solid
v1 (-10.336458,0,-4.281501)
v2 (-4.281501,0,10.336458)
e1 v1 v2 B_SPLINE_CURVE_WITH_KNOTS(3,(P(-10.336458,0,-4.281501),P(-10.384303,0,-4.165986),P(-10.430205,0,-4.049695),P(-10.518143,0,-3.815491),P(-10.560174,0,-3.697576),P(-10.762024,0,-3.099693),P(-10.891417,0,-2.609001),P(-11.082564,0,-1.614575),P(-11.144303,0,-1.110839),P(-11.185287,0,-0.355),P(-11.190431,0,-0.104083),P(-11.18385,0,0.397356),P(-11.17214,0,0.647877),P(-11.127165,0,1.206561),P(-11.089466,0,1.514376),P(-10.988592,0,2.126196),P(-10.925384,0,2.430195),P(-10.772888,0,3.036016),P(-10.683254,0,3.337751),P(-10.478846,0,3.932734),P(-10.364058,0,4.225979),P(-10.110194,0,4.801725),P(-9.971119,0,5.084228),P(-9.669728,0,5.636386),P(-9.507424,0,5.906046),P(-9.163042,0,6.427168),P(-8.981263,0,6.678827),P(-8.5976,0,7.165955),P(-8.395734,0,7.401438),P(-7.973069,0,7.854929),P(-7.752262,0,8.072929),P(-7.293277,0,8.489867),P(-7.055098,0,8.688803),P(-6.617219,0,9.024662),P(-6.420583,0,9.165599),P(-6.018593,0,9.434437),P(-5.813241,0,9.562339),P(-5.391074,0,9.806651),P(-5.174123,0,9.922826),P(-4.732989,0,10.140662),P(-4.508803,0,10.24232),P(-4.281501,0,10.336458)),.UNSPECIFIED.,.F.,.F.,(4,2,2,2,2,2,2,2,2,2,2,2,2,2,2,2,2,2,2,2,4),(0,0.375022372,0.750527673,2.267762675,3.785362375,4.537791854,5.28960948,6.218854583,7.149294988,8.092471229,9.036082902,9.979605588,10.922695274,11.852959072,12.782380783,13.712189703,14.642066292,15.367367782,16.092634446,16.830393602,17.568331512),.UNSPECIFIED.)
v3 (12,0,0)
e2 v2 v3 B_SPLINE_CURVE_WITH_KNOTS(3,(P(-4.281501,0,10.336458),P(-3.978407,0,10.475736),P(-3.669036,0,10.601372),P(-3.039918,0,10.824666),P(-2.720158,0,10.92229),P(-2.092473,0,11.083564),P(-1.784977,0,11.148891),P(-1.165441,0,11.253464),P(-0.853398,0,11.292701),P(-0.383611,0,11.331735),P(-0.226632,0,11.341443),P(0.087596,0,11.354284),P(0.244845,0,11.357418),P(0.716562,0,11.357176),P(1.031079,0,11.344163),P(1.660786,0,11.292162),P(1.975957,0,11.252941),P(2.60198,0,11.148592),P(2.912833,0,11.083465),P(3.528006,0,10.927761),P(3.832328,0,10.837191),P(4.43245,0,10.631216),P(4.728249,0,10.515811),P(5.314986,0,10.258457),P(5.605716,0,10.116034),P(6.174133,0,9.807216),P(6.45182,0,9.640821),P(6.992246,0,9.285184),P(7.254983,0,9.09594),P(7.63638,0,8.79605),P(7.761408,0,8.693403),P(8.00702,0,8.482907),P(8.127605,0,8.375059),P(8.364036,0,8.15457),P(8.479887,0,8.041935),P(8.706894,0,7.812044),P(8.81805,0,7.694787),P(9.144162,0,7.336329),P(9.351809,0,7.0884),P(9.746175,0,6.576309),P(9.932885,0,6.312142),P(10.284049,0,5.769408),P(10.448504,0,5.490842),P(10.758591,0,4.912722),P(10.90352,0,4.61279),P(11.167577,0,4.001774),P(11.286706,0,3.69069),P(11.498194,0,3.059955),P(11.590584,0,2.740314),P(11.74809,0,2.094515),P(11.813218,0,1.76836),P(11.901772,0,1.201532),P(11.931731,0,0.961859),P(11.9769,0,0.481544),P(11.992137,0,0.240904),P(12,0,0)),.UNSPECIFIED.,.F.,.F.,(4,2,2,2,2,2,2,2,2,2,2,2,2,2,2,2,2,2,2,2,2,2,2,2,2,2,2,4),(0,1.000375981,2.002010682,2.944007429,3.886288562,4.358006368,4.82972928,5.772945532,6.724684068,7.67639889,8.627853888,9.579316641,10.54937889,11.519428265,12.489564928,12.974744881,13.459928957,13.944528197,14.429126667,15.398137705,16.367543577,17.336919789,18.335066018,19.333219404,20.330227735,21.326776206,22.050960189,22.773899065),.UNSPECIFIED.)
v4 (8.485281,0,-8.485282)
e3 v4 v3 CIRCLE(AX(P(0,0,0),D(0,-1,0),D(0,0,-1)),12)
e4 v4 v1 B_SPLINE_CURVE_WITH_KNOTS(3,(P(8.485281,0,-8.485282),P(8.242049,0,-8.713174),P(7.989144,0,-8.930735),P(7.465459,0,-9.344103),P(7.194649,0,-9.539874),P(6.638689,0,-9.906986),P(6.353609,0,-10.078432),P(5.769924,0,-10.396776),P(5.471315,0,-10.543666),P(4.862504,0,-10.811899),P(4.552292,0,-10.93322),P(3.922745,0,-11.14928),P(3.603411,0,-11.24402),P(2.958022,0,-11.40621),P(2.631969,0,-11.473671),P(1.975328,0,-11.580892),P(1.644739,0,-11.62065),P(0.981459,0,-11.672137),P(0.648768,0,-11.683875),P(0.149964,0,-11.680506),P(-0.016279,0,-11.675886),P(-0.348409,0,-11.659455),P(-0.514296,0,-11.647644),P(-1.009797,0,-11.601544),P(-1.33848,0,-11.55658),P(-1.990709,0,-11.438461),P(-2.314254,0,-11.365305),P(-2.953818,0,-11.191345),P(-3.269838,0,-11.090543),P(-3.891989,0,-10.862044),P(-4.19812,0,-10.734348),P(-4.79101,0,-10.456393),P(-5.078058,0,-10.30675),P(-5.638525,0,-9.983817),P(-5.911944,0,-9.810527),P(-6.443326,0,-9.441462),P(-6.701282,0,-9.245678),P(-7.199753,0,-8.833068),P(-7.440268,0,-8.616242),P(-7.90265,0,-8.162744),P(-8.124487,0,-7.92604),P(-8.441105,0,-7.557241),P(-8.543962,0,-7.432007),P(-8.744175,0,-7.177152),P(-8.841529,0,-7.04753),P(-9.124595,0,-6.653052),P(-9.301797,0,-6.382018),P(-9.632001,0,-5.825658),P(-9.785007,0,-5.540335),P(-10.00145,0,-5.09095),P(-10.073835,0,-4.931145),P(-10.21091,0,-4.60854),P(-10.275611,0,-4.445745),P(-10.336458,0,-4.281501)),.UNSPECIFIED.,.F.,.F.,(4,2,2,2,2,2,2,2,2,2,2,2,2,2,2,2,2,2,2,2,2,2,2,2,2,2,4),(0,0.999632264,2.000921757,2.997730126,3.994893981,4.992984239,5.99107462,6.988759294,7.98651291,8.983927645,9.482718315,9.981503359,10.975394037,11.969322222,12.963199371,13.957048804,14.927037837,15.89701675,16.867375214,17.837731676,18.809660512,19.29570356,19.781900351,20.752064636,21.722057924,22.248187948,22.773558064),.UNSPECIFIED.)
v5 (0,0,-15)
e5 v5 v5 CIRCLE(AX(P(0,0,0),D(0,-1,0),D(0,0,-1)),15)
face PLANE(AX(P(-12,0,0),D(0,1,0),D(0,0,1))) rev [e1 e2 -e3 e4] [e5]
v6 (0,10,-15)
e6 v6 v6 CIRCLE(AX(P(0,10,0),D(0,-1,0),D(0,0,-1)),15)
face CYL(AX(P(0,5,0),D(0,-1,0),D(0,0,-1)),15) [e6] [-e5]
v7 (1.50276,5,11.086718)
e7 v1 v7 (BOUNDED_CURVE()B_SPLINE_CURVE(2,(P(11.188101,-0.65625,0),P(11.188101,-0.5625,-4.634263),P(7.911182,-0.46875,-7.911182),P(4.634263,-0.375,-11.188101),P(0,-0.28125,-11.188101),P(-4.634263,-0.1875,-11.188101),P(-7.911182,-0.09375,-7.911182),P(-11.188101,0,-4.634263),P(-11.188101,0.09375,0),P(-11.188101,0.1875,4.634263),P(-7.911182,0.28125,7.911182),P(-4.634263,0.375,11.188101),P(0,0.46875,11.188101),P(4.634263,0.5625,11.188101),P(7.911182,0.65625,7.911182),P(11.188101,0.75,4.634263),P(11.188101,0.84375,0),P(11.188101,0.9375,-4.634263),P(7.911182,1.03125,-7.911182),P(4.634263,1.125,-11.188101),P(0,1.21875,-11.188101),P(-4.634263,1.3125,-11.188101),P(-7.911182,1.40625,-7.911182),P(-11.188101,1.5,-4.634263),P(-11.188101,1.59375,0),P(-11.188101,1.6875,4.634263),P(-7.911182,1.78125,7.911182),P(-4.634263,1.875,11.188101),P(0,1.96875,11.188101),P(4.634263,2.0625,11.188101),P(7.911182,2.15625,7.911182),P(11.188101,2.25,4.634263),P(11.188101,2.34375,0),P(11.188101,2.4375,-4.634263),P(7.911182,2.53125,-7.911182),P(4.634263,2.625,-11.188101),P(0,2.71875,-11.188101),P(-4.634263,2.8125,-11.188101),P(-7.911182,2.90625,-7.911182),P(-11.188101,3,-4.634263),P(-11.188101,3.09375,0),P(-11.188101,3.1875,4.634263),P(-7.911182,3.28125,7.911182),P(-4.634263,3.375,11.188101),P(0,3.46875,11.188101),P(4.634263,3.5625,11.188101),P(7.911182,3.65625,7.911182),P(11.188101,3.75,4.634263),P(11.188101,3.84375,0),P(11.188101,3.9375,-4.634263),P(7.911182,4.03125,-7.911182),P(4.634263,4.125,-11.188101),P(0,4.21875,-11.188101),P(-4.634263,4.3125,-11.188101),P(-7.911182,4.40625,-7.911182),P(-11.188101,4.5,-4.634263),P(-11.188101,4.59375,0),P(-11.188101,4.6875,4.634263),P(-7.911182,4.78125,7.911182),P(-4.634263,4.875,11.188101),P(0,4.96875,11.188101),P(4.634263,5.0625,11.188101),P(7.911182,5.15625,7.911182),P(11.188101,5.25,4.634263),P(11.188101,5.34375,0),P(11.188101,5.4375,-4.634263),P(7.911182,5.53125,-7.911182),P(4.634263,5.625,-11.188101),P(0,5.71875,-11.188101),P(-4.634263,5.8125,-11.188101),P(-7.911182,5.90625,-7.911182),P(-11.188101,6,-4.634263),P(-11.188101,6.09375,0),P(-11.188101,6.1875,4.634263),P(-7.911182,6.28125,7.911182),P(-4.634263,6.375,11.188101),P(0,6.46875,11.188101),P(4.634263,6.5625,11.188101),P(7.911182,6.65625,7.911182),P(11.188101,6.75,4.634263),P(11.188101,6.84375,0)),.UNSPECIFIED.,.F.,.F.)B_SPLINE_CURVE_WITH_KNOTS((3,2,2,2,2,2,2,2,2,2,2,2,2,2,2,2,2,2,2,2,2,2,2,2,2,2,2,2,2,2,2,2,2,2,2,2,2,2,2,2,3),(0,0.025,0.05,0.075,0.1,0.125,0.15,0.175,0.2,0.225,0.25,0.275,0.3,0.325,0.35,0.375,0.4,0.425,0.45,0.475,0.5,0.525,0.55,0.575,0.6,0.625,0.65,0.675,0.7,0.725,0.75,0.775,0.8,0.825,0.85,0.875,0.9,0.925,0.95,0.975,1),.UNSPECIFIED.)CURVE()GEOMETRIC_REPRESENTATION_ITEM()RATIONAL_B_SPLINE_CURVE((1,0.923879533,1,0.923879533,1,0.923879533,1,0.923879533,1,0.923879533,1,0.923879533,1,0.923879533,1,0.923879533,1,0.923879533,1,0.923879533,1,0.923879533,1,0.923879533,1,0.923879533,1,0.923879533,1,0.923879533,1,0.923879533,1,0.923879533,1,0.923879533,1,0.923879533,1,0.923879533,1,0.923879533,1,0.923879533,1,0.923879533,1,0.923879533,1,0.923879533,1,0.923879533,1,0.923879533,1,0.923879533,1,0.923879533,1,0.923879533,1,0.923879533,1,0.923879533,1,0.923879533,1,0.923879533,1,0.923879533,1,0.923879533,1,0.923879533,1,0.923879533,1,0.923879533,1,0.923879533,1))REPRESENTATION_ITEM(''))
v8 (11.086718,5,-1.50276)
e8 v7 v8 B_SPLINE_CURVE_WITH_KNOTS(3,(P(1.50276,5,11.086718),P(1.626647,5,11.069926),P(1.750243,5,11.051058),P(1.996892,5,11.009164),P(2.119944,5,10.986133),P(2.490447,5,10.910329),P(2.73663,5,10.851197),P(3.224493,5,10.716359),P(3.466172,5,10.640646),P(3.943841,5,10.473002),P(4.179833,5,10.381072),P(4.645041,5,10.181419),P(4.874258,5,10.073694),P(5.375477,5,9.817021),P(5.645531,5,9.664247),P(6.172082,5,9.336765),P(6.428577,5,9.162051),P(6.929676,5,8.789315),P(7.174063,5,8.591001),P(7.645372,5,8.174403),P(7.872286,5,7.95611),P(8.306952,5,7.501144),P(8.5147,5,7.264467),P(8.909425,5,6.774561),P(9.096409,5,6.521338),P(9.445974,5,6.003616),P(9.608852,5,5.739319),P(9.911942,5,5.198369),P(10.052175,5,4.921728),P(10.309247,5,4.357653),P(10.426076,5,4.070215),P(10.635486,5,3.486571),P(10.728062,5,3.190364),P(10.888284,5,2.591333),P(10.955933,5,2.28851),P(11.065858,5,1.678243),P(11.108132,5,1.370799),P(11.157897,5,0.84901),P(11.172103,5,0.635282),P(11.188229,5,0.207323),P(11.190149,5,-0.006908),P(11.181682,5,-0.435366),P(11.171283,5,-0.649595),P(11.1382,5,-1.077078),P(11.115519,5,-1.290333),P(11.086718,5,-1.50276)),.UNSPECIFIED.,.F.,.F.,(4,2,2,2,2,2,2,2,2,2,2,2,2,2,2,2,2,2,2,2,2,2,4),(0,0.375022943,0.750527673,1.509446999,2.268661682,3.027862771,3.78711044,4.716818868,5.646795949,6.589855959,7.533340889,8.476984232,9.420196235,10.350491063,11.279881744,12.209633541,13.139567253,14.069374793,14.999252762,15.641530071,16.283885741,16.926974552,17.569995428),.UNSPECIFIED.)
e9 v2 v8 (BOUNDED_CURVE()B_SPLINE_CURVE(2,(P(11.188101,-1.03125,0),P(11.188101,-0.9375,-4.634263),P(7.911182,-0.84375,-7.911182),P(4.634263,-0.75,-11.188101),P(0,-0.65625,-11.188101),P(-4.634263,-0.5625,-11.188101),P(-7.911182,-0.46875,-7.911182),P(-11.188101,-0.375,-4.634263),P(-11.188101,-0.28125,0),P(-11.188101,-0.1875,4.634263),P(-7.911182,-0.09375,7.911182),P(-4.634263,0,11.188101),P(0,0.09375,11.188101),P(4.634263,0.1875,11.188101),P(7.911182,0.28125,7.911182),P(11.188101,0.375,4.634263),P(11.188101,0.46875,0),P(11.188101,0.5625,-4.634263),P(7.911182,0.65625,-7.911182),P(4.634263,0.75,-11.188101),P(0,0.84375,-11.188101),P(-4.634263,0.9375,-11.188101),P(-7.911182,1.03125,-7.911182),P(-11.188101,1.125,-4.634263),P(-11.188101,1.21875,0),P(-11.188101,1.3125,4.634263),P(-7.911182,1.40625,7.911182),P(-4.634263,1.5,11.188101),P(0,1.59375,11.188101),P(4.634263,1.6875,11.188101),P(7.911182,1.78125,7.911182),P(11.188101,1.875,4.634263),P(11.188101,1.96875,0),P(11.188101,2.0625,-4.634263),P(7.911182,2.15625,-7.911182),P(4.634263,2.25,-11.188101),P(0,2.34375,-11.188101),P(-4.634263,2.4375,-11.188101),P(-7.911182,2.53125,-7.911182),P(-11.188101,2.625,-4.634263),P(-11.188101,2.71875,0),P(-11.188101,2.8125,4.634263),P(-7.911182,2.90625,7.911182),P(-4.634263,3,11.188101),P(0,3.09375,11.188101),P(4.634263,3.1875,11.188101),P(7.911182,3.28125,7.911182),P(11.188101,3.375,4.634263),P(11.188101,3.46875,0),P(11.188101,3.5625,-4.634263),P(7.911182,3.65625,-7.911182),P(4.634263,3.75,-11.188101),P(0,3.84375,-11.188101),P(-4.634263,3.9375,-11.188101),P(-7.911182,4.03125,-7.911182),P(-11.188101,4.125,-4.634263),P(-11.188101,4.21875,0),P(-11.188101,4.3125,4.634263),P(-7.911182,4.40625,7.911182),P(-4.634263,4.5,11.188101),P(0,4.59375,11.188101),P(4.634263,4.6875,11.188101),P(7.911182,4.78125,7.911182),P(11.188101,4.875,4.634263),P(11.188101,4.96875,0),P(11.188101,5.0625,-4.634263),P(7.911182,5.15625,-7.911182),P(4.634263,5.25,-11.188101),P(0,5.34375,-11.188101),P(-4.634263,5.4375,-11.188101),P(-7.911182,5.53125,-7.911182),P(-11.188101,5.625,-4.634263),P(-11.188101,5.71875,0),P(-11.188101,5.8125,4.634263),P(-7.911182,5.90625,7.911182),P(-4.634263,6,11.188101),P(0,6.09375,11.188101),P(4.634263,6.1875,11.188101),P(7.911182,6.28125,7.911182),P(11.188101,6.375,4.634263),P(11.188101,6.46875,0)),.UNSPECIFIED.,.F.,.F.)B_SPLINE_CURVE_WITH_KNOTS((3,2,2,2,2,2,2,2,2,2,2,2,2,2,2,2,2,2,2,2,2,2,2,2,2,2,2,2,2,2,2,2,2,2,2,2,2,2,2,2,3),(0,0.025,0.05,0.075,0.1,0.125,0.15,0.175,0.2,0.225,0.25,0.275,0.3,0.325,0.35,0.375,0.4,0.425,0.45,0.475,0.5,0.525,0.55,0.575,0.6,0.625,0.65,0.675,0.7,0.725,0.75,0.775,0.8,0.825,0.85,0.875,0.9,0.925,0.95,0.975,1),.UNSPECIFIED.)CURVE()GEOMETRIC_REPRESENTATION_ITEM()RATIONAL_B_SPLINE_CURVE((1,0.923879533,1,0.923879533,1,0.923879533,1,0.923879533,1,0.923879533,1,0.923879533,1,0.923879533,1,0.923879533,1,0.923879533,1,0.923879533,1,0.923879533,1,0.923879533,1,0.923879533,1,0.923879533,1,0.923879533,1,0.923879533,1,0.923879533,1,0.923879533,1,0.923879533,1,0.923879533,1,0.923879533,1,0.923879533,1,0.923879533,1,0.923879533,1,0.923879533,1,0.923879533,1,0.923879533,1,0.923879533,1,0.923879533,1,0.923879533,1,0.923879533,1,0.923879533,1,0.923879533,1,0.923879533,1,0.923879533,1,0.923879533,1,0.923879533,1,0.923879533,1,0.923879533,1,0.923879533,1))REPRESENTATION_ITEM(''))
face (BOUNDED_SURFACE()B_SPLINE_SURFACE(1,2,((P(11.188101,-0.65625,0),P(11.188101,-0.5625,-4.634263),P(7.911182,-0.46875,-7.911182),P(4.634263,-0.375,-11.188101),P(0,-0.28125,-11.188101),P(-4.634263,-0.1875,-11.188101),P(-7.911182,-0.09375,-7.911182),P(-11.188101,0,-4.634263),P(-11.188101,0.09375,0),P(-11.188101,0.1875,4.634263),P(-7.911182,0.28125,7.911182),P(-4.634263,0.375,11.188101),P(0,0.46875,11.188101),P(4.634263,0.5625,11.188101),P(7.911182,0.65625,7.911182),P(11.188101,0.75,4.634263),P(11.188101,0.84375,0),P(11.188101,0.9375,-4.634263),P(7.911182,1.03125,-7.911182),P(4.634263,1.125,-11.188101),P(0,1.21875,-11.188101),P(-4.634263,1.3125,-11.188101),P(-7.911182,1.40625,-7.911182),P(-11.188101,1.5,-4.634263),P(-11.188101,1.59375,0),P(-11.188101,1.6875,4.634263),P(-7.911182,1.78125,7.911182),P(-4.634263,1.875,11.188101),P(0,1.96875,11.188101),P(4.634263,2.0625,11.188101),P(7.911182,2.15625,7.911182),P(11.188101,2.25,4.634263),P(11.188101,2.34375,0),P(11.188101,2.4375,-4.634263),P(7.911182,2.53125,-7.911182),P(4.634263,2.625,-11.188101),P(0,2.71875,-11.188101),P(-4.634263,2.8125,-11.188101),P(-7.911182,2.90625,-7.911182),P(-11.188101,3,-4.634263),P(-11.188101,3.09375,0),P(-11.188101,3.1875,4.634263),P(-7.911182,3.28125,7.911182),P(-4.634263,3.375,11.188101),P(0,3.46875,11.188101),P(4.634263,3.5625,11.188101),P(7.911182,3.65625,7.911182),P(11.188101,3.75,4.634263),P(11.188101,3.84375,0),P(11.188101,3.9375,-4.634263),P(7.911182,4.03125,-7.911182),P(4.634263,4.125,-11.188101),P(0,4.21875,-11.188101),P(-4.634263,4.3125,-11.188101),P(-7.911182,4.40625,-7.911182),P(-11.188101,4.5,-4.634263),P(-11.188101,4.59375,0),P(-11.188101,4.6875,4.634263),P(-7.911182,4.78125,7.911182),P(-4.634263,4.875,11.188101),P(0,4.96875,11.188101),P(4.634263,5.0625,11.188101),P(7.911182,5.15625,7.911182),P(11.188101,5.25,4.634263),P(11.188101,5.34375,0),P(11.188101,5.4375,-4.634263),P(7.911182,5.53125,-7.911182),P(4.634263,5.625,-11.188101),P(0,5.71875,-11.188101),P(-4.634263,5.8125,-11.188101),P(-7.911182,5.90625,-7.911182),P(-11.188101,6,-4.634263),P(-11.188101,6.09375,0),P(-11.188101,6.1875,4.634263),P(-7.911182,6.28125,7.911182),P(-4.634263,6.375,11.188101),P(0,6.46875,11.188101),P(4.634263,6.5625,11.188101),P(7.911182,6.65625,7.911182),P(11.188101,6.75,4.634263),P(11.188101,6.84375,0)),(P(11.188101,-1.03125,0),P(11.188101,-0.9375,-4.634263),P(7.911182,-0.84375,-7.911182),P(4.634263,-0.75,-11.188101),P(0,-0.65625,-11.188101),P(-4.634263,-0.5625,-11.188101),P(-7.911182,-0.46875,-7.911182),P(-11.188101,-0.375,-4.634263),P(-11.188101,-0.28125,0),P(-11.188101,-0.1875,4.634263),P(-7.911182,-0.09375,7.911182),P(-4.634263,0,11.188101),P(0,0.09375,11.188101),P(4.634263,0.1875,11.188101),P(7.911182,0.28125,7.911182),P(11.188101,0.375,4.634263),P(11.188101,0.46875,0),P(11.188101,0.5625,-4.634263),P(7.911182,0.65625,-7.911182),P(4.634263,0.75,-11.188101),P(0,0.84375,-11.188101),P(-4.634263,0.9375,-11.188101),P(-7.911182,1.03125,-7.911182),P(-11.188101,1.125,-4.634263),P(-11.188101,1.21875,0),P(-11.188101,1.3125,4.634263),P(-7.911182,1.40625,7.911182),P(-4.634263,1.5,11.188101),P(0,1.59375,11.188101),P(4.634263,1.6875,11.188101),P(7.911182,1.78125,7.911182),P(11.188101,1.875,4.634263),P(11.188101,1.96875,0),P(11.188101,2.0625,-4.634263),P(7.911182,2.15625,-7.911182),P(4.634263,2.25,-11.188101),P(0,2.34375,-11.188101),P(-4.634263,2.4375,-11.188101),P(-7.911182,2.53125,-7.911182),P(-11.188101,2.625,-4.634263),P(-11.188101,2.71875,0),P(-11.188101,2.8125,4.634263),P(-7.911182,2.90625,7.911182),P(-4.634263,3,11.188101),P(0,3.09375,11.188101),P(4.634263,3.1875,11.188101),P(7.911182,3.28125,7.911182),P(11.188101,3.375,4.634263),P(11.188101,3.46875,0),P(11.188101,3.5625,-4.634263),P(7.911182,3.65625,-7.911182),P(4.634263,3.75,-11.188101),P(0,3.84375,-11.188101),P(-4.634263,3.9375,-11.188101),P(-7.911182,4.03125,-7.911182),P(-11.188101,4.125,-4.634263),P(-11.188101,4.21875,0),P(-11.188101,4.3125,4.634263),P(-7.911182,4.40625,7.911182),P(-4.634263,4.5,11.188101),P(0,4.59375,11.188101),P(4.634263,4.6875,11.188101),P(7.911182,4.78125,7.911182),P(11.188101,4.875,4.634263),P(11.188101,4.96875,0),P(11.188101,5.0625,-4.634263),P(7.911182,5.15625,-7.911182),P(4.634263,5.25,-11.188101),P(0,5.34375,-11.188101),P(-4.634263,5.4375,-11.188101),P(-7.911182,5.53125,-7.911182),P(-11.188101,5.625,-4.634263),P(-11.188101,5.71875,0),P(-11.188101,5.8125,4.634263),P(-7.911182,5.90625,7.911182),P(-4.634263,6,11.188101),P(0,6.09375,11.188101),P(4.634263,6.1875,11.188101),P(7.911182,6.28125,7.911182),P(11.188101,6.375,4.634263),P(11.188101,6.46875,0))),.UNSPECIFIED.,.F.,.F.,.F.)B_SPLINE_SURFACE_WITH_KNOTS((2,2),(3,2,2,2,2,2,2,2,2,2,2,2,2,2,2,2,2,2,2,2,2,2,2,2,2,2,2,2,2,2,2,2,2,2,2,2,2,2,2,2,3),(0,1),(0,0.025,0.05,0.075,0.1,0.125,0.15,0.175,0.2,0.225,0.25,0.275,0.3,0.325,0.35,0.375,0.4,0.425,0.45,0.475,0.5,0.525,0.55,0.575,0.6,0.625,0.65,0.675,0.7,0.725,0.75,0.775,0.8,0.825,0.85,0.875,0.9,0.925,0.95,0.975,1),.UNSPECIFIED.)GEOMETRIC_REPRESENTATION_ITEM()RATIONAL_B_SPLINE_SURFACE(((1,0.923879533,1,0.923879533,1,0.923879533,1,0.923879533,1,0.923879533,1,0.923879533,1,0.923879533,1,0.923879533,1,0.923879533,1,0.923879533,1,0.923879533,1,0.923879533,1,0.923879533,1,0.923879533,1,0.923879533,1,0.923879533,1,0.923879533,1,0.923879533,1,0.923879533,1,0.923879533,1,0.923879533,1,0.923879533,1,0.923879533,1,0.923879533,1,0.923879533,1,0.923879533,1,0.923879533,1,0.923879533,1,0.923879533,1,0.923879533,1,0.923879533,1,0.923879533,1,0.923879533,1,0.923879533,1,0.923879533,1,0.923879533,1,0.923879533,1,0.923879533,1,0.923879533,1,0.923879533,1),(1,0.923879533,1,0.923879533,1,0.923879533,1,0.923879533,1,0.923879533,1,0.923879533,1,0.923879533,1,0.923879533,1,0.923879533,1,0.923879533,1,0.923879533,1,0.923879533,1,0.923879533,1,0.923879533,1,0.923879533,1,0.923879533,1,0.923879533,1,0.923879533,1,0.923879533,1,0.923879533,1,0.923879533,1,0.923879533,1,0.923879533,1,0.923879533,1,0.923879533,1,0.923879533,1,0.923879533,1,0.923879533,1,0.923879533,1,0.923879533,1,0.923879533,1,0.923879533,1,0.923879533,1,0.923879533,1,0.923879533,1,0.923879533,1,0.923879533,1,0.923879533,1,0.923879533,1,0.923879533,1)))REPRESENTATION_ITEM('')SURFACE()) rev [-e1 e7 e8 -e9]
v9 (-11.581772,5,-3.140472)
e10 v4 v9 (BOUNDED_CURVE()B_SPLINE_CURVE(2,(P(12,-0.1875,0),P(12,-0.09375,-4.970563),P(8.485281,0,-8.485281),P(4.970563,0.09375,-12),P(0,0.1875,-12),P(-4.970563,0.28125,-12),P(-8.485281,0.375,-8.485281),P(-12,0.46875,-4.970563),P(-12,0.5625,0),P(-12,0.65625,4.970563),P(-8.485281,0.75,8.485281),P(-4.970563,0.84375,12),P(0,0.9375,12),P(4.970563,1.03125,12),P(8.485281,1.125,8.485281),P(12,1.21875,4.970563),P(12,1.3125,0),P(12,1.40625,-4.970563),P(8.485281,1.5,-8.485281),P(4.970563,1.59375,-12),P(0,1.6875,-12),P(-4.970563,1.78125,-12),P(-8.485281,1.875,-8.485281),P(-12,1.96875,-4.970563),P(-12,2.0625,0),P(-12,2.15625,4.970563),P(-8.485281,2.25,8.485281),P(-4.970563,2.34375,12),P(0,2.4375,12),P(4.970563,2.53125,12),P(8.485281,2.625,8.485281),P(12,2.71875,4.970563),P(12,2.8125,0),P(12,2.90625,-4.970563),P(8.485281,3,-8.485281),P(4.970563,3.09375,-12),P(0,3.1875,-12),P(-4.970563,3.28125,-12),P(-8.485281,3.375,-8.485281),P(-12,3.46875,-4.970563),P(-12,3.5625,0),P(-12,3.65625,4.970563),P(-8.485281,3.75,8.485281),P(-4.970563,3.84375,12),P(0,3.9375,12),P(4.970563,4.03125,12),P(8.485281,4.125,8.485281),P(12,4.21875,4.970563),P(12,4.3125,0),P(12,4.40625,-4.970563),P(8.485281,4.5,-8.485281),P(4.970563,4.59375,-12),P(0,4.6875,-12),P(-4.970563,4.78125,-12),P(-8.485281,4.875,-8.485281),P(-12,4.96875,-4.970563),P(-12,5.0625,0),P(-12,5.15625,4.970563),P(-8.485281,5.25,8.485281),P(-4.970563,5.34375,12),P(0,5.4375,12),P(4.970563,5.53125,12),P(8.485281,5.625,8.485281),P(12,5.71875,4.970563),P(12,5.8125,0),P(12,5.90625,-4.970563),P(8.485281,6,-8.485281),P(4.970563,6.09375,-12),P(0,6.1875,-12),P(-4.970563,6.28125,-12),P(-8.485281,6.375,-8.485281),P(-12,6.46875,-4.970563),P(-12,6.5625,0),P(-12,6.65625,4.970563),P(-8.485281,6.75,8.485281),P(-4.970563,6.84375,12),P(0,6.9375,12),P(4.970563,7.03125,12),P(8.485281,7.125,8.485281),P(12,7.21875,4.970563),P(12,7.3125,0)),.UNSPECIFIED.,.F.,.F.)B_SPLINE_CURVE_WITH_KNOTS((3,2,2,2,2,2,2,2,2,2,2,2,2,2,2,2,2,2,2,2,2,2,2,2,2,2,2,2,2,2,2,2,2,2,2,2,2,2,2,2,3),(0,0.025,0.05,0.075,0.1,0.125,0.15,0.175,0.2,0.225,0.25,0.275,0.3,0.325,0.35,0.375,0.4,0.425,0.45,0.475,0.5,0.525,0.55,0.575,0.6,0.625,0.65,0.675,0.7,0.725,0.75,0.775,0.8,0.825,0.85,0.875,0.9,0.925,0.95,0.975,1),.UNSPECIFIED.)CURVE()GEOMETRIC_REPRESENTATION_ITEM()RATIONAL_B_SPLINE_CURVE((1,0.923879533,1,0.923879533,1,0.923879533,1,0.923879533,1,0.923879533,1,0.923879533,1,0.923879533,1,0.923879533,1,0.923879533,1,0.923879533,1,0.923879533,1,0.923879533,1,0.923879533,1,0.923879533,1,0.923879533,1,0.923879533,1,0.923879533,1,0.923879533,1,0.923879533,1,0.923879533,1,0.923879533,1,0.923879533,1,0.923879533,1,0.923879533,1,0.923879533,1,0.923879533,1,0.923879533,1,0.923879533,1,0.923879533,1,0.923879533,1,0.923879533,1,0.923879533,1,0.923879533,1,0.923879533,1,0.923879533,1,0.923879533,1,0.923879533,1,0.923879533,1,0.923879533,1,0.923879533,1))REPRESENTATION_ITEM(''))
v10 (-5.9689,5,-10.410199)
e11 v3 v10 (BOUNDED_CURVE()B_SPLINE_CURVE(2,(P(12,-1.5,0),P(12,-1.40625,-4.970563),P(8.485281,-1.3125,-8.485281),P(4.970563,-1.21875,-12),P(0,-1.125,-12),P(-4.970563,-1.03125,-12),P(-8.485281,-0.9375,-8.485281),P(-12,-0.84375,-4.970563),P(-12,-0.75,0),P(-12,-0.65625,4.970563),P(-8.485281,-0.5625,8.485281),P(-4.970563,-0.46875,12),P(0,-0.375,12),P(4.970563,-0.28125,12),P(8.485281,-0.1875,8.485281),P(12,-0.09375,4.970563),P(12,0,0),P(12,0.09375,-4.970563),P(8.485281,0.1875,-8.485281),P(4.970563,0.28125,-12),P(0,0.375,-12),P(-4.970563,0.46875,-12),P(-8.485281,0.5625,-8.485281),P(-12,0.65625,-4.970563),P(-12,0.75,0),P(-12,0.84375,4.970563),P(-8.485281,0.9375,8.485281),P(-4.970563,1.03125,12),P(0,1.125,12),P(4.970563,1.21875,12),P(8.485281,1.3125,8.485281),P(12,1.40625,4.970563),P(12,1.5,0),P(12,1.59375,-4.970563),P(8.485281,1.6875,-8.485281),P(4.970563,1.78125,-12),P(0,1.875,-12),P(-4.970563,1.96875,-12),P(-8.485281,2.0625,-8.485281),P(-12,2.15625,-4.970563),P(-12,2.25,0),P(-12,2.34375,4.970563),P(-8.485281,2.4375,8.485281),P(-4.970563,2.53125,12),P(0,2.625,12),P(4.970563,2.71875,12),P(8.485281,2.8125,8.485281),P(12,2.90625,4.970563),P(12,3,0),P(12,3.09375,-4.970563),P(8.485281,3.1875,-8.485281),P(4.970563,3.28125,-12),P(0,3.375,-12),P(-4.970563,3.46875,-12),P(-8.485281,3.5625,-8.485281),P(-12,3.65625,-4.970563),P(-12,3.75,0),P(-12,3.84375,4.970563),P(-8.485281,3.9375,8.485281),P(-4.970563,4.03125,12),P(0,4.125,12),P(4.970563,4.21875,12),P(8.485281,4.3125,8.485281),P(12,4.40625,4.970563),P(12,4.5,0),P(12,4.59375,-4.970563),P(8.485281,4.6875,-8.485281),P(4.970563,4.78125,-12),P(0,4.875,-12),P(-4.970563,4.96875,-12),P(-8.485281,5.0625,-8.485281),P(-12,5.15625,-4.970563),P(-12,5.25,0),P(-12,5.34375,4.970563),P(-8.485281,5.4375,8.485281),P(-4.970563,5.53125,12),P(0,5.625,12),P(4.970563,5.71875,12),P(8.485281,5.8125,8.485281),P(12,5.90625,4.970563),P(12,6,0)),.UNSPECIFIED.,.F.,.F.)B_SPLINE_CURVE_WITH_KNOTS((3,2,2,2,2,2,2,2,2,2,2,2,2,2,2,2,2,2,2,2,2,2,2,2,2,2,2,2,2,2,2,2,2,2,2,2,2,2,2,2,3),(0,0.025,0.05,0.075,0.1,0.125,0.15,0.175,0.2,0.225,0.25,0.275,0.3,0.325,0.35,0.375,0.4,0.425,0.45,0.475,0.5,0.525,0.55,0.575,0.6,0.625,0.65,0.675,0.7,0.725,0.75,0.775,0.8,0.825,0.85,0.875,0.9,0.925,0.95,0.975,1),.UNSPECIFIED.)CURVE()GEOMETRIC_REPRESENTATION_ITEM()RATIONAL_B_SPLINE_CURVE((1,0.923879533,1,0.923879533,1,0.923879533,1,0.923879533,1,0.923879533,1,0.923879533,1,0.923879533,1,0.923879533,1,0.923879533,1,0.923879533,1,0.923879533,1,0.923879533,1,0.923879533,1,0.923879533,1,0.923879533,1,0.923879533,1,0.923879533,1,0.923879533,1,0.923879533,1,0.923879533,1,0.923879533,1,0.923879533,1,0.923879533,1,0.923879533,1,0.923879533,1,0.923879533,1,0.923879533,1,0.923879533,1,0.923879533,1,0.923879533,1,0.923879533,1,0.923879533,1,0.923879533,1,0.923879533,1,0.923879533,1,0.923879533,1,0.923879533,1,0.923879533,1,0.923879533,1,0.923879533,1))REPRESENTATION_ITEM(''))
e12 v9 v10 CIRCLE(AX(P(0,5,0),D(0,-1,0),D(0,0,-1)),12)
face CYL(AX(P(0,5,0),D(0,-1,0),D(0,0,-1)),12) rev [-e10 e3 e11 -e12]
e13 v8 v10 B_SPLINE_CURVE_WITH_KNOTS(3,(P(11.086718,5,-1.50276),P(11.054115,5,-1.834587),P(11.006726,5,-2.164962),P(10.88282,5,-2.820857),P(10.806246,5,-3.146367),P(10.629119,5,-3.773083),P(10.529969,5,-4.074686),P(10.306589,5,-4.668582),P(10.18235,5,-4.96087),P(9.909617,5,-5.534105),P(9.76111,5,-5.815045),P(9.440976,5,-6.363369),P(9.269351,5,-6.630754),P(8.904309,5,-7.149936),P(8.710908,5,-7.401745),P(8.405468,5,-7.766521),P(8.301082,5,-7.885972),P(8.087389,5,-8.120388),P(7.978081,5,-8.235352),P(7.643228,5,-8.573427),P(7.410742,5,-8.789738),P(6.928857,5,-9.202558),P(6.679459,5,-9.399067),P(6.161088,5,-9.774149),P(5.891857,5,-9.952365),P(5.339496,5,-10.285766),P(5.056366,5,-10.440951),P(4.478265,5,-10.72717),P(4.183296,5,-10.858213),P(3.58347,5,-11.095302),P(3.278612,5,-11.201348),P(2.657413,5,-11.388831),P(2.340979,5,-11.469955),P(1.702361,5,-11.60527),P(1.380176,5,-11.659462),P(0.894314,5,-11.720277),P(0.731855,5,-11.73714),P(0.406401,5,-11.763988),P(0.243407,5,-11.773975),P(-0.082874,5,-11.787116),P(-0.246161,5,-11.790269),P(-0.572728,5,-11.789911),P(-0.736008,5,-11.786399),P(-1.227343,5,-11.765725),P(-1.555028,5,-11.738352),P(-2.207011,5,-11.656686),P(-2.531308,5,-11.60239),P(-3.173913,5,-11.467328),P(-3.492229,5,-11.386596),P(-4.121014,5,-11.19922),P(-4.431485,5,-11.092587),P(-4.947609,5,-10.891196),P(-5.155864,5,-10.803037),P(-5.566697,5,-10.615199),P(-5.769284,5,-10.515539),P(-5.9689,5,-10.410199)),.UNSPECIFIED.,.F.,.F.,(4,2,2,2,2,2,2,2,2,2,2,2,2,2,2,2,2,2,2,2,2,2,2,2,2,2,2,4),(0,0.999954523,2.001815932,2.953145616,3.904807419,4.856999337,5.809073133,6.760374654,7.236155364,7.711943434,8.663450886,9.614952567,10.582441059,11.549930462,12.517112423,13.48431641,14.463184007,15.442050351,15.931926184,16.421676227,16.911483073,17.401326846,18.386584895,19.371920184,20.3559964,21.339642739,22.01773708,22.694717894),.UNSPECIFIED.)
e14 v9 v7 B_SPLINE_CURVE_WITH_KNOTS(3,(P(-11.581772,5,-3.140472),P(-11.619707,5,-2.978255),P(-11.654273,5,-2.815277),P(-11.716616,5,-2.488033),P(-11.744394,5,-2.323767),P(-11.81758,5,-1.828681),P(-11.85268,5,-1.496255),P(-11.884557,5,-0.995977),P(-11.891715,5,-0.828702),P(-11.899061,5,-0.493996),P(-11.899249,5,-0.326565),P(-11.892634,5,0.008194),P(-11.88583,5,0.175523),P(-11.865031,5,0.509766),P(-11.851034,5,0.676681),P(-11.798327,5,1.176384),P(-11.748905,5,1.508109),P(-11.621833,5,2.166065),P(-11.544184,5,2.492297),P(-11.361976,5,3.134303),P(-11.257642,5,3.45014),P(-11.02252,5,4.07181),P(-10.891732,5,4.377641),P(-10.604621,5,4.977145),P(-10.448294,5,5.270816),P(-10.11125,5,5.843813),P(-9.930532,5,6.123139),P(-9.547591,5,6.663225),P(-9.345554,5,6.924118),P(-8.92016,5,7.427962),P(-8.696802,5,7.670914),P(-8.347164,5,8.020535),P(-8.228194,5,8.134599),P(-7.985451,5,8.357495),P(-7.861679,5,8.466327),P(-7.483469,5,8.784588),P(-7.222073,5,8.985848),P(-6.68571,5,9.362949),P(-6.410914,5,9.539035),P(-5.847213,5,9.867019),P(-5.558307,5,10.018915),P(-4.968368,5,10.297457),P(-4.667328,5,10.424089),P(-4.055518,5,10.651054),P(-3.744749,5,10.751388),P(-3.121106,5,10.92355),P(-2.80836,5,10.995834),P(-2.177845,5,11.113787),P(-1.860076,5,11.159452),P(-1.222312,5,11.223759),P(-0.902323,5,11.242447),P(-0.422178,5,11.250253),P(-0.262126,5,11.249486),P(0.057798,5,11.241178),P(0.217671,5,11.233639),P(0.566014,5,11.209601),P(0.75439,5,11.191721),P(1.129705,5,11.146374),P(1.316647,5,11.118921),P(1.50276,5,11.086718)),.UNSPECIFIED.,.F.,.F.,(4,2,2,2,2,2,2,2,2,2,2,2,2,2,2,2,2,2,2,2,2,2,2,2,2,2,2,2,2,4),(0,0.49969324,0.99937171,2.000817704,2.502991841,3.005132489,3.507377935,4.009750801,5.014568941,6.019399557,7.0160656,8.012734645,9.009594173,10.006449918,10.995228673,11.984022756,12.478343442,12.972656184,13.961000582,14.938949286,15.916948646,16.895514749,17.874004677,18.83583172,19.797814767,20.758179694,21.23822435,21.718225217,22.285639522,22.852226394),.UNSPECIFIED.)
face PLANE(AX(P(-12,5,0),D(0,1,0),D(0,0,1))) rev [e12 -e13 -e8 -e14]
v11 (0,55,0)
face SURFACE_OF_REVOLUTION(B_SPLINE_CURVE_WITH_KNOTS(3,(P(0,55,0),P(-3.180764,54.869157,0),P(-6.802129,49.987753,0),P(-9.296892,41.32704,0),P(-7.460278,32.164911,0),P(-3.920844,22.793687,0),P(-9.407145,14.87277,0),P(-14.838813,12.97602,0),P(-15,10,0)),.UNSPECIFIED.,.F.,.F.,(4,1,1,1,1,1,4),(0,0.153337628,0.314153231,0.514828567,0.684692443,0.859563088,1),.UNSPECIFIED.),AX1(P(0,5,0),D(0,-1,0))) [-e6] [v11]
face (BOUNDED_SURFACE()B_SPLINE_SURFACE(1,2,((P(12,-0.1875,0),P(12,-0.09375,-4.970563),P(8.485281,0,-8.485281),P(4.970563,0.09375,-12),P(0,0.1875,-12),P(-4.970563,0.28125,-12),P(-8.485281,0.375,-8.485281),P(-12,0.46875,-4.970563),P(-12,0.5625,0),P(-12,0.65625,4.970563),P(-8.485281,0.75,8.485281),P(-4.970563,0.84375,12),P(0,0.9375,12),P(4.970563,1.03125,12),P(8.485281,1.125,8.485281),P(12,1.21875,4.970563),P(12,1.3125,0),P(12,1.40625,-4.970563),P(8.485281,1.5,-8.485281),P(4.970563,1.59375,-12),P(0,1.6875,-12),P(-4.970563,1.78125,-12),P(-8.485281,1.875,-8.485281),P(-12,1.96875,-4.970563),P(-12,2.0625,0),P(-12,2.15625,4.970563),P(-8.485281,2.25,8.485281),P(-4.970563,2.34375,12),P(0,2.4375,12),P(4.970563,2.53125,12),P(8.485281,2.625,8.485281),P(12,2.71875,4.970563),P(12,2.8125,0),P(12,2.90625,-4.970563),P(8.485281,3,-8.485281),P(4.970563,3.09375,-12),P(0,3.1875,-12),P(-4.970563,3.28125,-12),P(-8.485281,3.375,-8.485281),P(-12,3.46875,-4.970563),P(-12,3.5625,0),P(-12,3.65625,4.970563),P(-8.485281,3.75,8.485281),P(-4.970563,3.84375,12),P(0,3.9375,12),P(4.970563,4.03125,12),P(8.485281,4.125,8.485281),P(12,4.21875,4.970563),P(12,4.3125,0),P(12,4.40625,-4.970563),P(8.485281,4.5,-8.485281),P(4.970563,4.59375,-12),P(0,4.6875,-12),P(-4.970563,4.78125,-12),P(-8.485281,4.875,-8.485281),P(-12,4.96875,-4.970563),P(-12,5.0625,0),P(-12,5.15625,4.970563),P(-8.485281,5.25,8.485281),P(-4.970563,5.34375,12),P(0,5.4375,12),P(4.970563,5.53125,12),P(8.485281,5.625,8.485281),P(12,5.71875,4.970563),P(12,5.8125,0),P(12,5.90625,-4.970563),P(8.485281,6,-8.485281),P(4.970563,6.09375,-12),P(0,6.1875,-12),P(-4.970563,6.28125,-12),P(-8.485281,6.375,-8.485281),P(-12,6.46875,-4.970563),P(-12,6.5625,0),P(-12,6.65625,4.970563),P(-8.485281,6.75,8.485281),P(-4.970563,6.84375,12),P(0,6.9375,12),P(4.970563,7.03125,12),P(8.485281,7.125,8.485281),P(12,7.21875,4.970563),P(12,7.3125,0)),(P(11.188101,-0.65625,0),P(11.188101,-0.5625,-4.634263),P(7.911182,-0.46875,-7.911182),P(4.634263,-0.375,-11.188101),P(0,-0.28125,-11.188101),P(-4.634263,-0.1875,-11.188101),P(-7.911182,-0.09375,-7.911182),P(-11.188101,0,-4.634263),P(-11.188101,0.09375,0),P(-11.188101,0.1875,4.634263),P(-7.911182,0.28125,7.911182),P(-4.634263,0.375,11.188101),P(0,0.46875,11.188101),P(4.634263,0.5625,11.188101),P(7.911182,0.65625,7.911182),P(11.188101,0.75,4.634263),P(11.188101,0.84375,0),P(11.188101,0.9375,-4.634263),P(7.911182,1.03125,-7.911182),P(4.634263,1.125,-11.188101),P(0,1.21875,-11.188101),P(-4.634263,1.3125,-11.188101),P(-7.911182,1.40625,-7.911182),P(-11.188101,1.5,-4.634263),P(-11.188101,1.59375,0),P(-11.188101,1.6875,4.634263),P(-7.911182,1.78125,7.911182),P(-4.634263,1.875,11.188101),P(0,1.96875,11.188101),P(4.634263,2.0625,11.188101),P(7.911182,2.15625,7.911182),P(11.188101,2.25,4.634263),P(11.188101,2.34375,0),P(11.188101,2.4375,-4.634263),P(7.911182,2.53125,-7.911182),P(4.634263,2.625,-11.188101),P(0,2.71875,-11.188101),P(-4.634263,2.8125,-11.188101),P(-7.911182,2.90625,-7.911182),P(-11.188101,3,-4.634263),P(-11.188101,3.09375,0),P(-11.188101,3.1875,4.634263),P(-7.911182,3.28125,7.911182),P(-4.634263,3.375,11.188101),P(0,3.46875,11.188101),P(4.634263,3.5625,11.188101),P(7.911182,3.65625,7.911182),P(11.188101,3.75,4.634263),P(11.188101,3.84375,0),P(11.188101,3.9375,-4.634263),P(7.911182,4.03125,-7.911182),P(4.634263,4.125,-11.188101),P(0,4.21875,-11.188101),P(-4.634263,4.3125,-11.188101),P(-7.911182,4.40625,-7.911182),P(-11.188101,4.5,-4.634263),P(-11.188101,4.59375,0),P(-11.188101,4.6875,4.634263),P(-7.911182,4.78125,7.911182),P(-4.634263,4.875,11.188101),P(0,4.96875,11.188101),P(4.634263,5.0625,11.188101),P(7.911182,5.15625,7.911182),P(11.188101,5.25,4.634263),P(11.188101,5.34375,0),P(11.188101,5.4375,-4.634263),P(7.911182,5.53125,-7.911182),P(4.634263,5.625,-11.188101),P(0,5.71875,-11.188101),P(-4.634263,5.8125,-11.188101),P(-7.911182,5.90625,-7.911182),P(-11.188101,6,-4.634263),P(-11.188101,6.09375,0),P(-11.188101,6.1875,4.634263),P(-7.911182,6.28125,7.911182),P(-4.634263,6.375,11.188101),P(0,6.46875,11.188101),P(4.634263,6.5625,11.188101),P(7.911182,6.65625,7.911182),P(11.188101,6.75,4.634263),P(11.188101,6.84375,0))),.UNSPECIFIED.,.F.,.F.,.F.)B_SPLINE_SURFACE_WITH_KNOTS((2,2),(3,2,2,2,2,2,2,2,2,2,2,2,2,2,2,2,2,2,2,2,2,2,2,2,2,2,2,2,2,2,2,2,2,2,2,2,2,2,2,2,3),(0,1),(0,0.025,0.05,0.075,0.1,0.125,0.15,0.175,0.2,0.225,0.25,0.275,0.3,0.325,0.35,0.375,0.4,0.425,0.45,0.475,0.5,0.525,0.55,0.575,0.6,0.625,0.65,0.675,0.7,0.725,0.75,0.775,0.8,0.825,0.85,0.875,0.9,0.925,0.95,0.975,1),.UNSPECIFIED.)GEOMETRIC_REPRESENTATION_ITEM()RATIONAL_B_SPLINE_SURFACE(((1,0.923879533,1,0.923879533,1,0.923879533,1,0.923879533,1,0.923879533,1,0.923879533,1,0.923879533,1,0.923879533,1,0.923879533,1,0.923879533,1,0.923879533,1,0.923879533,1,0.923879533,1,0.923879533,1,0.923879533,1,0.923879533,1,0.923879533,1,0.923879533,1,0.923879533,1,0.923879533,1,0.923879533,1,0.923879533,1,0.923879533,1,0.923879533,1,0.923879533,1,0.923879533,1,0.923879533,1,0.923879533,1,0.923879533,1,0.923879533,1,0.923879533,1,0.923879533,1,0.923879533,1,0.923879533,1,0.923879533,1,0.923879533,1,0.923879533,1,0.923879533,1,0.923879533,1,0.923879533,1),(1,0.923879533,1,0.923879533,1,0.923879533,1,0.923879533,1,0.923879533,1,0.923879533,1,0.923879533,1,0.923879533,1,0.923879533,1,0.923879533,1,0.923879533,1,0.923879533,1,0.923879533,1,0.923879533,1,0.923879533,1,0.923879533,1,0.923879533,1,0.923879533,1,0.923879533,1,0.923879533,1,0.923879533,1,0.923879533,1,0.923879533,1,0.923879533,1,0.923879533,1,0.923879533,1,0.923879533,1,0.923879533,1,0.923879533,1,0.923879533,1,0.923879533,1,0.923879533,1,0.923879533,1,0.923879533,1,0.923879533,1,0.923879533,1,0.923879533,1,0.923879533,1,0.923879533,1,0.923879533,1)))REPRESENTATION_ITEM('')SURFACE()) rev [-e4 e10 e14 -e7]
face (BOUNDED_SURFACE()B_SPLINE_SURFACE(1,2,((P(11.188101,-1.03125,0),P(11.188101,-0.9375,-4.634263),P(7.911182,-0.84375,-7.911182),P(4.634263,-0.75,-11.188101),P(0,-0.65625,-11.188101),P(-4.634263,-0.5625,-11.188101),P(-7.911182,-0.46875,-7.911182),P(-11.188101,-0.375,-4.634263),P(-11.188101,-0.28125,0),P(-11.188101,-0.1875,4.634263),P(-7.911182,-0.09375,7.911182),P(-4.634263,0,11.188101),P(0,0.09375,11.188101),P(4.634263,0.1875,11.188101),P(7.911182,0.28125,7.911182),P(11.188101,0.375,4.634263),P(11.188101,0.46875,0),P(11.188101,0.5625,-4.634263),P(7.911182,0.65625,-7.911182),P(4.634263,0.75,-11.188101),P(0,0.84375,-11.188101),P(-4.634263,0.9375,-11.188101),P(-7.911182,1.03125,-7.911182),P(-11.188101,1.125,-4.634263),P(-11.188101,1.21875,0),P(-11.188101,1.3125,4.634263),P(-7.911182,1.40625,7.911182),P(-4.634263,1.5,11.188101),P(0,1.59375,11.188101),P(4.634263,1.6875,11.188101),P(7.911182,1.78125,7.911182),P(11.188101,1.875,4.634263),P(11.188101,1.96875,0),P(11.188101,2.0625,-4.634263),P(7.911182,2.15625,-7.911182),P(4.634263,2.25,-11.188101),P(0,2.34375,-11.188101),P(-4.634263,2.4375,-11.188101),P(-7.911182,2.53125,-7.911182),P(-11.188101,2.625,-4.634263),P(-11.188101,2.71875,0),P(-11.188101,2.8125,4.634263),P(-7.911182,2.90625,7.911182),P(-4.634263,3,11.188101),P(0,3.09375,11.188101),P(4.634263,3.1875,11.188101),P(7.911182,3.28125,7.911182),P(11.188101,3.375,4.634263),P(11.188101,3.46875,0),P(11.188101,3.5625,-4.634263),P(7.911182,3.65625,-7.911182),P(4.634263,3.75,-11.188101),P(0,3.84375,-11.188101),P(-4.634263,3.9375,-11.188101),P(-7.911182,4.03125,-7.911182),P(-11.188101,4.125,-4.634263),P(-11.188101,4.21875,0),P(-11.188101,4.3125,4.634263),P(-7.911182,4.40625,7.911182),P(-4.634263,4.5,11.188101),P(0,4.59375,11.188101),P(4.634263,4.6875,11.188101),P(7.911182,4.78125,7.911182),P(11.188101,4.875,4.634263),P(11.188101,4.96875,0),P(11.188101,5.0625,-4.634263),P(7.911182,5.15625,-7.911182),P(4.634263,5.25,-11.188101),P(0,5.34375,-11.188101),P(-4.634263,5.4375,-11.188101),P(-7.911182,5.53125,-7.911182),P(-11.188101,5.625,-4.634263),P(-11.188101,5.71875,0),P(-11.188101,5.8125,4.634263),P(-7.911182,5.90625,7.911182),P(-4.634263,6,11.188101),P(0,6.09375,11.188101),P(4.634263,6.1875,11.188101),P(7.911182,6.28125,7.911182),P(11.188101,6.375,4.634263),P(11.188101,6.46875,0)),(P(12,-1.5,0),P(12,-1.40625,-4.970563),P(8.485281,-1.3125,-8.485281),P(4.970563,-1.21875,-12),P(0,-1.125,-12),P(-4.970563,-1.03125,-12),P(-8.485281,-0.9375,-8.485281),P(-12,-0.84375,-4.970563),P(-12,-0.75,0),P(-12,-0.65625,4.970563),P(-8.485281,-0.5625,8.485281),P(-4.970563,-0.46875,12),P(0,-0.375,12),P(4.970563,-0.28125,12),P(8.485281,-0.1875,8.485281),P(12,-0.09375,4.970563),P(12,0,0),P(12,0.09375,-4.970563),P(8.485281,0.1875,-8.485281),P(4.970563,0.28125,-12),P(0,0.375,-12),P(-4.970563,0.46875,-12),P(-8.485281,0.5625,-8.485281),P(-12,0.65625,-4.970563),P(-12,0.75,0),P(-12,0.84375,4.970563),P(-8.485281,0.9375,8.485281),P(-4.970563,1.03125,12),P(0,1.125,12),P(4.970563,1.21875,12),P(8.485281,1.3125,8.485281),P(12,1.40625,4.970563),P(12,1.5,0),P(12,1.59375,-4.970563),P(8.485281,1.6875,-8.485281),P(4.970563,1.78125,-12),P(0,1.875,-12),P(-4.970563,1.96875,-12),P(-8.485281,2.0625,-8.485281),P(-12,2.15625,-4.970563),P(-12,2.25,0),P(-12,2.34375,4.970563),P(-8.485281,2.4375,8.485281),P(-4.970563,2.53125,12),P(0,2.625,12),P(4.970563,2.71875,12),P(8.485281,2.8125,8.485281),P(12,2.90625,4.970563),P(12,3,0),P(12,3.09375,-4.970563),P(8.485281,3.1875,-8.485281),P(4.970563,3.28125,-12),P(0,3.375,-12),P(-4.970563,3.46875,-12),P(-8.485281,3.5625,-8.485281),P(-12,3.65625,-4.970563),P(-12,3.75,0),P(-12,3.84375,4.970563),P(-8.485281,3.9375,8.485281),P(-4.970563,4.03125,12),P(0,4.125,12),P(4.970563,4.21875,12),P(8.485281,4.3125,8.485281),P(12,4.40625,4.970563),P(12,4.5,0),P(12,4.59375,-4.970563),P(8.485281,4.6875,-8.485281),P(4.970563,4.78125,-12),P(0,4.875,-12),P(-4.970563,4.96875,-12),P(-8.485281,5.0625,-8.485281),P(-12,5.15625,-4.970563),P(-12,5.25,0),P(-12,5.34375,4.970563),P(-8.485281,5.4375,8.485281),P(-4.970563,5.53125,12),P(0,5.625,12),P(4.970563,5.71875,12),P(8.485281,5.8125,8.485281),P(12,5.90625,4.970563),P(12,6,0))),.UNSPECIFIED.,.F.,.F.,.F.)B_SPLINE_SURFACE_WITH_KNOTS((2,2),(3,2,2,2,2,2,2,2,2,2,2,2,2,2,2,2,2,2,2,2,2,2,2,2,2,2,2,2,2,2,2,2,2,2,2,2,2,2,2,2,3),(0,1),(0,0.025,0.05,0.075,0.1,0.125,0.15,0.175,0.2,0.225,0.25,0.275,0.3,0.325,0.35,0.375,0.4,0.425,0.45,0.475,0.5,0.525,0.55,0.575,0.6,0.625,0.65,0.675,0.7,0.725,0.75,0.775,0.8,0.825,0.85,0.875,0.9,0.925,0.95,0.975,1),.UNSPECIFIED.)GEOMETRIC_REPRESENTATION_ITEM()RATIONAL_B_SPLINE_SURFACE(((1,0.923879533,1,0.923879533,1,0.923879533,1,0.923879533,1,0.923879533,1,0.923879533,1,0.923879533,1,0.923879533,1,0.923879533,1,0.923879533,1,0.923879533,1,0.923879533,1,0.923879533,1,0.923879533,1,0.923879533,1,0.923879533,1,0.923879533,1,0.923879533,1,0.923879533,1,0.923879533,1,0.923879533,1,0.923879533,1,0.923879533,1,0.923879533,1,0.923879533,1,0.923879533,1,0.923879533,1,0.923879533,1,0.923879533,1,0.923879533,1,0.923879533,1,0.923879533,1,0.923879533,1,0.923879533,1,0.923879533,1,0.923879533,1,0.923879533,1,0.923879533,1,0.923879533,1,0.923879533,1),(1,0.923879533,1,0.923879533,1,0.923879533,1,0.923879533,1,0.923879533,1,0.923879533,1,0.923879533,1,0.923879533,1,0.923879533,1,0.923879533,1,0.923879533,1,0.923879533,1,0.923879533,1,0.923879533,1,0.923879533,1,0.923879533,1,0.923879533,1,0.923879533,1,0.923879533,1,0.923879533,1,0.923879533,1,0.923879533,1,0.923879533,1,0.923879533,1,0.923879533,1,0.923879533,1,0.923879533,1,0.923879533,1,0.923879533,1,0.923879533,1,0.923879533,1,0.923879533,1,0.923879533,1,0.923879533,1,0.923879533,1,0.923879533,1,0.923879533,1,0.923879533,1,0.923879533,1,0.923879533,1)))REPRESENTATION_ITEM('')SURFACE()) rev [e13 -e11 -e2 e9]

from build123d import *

# Parameters (mm, degrees)
ROSCA1_PITCH          = 1.5
CORTAR_EXTRUIR1_START = 10
CROQUIS3_R            = 15
CORTAR_EXTRUIR1_DEPTH = 10


with BuildPart() as part:
    # Croquis1 → Revolución1 (revolve)
    with BuildSketch(Plane.XY, mode=Mode.PRIVATE) as revoluci_n1_sk:
        with BuildLine():
            Line((-12, 0), (-12, 5))
            Line((-12, 5), (0, 5))
            Line((0, 5), (0, 55))
            add(Edge.make_bspline(
                [(0, 55), (-3.180764289, 54.869157284), (-6.802128833, 49.987752556), (-9.296892214, 41.327039564), (-7.460278375, 32.164910722), (-3.920844043, 22.793687376), (-9.40714477, 14.872769973), (-14.838813261, 12.976020169), (-15, 10)],
                knots=[0, 0, 0, 0, 0.153337628, 0.314153231, 0.514828567, 0.684692443, 0.859563088, 1, 1, 1, 1], degree=3))
            Line((-15, 10), (-15, 0))
            Line((-15, 0), (-12, 0))
        make_face()
    revolve(revoluci_n1_sk.sketch.rotate(Axis((0, 5, 0), (0, 1, 0)), 270), axis=Axis((0, 5, 0), (0, 1, 0)))

    # Rosca1: the profile of Perfil de rosca1 profile screwed along a right-hand helix of 4.333333 turns, 8 arcs to a turn; built about Z, then put on its axis
    rosca1_z = Axis((0, 0, 0), (0, 0, 1))
    rosca1_corners = [(12.0003, 0, -0.000173205), (12.0003, 0, 1.312673201), (11.188101187, 0, 0.843749998), (11.188101187, 0, 0.468749998)]
    with BuildLine(mode=Mode.PRIVATE) as rosca1_profile:
        Line(rosca1_corners[0], rosca1_corners[1])
        Line(rosca1_corners[1], rosca1_corners[2])
        Line(rosca1_corners[2], rosca1_corners[3])
        Line(rosca1_corners[3], rosca1_corners[0])
    rosca1_cap = Face(rosca1_profile.wire())
    rosca1_turn_angles = [0, 22.5, 45, 67.5, 90, 112.5, 135, 157.5, 180, 202.5, 225, 247.5, 270, 292.5, 315, 337.5, 360]
    rosca1_turn_weights = [1, 0.9238795325112867, 1, 0.9238795325112867, 1, 0.9238795325112867, 1, 0.9238795325112867, 1, 0.9238795325112867, 1, 0.9238795325112867, 1, 0.9238795325112867, 1, 0.9238795325112867, 1]
    rosca1_turn_rails = [Edge.make_bspline([Vector(p[0], p[1], 0).rotate(rosca1_z, rosca1_turn_angles[k]) / rosca1_turn_weights[k] + Vector(0, 0, p[2] + ROSCA1_PITCH * rosca1_turn_angles[k] / 360) for k in range(17)], [0, 0, 0, 1, 1, 2, 2, 3, 3, 4, 4, 5, 5, 6, 6, 7, 7, 8, 8, 8], 2, rosca1_turn_weights) for p in rosca1_corners]
    rosca1_turn_sides = [Face.make_surface_from_curves(rosca1_turn_rails[p[0]], rosca1_turn_rails[p[1]]) for p in [(0, 1), (1, 2), (2, 3), (3, 0)]]
    rosca1_last_angles = [1440, 1462.5, 1485, 1507.5, 1530, 1545, 1560]
    rosca1_last_weights = [1, 0.9238795325112867, 1, 0.9238795325112867, 1, 0.9659258262890683, 1]
    rosca1_last_rails = [Edge.make_bspline([Vector(p[0], p[1], 0).rotate(rosca1_z, rosca1_last_angles[k]) / rosca1_last_weights[k] + Vector(0, 0, p[2] + ROSCA1_PITCH * rosca1_last_angles[k] / 360) for k in range(7)], [0, 0, 0, 1, 1, 2, 2, 3, 3, 3], 2, rosca1_last_weights) for p in rosca1_corners]
    rosca1_last_sides = [Face.make_surface_from_curves(rosca1_last_rails[p[0]], rosca1_last_rails[p[1]]) for p in [(0, 1), (1, 2), (2, 3), (3, 0)]]
    rosca1 = Plane(origin=(0, -1.5, 0), x_dir=(1, 0, 0), z_dir=(0, 1, 0)) * Solid(Shell([*[p.moved(Location((0, 0, ROSCA1_PITCH * i))) for i in range(4) for p in rosca1_turn_sides], *rosca1_last_sides, rosca1_cap, rosca1_cap.rotate(rosca1_z, 1560).moved(Location((0, 0, ROSCA1_PITCH * 1560 / 360)))]))
    add(rosca1)

    # Croquis3 → Cortar-Extruir1 (cut)
    with BuildSketch(Plane.XZ.offset(CORTAR_EXTRUIR1_START)):
        with Locations(Location((0, 0, 0), (0, 0, 270))):
            Circle(CROQUIS3_R)
    extrude(amount=-CORTAR_EXTRUIR1_DEPTH, mode=Mode.SUBTRACT)


solid = part.part
